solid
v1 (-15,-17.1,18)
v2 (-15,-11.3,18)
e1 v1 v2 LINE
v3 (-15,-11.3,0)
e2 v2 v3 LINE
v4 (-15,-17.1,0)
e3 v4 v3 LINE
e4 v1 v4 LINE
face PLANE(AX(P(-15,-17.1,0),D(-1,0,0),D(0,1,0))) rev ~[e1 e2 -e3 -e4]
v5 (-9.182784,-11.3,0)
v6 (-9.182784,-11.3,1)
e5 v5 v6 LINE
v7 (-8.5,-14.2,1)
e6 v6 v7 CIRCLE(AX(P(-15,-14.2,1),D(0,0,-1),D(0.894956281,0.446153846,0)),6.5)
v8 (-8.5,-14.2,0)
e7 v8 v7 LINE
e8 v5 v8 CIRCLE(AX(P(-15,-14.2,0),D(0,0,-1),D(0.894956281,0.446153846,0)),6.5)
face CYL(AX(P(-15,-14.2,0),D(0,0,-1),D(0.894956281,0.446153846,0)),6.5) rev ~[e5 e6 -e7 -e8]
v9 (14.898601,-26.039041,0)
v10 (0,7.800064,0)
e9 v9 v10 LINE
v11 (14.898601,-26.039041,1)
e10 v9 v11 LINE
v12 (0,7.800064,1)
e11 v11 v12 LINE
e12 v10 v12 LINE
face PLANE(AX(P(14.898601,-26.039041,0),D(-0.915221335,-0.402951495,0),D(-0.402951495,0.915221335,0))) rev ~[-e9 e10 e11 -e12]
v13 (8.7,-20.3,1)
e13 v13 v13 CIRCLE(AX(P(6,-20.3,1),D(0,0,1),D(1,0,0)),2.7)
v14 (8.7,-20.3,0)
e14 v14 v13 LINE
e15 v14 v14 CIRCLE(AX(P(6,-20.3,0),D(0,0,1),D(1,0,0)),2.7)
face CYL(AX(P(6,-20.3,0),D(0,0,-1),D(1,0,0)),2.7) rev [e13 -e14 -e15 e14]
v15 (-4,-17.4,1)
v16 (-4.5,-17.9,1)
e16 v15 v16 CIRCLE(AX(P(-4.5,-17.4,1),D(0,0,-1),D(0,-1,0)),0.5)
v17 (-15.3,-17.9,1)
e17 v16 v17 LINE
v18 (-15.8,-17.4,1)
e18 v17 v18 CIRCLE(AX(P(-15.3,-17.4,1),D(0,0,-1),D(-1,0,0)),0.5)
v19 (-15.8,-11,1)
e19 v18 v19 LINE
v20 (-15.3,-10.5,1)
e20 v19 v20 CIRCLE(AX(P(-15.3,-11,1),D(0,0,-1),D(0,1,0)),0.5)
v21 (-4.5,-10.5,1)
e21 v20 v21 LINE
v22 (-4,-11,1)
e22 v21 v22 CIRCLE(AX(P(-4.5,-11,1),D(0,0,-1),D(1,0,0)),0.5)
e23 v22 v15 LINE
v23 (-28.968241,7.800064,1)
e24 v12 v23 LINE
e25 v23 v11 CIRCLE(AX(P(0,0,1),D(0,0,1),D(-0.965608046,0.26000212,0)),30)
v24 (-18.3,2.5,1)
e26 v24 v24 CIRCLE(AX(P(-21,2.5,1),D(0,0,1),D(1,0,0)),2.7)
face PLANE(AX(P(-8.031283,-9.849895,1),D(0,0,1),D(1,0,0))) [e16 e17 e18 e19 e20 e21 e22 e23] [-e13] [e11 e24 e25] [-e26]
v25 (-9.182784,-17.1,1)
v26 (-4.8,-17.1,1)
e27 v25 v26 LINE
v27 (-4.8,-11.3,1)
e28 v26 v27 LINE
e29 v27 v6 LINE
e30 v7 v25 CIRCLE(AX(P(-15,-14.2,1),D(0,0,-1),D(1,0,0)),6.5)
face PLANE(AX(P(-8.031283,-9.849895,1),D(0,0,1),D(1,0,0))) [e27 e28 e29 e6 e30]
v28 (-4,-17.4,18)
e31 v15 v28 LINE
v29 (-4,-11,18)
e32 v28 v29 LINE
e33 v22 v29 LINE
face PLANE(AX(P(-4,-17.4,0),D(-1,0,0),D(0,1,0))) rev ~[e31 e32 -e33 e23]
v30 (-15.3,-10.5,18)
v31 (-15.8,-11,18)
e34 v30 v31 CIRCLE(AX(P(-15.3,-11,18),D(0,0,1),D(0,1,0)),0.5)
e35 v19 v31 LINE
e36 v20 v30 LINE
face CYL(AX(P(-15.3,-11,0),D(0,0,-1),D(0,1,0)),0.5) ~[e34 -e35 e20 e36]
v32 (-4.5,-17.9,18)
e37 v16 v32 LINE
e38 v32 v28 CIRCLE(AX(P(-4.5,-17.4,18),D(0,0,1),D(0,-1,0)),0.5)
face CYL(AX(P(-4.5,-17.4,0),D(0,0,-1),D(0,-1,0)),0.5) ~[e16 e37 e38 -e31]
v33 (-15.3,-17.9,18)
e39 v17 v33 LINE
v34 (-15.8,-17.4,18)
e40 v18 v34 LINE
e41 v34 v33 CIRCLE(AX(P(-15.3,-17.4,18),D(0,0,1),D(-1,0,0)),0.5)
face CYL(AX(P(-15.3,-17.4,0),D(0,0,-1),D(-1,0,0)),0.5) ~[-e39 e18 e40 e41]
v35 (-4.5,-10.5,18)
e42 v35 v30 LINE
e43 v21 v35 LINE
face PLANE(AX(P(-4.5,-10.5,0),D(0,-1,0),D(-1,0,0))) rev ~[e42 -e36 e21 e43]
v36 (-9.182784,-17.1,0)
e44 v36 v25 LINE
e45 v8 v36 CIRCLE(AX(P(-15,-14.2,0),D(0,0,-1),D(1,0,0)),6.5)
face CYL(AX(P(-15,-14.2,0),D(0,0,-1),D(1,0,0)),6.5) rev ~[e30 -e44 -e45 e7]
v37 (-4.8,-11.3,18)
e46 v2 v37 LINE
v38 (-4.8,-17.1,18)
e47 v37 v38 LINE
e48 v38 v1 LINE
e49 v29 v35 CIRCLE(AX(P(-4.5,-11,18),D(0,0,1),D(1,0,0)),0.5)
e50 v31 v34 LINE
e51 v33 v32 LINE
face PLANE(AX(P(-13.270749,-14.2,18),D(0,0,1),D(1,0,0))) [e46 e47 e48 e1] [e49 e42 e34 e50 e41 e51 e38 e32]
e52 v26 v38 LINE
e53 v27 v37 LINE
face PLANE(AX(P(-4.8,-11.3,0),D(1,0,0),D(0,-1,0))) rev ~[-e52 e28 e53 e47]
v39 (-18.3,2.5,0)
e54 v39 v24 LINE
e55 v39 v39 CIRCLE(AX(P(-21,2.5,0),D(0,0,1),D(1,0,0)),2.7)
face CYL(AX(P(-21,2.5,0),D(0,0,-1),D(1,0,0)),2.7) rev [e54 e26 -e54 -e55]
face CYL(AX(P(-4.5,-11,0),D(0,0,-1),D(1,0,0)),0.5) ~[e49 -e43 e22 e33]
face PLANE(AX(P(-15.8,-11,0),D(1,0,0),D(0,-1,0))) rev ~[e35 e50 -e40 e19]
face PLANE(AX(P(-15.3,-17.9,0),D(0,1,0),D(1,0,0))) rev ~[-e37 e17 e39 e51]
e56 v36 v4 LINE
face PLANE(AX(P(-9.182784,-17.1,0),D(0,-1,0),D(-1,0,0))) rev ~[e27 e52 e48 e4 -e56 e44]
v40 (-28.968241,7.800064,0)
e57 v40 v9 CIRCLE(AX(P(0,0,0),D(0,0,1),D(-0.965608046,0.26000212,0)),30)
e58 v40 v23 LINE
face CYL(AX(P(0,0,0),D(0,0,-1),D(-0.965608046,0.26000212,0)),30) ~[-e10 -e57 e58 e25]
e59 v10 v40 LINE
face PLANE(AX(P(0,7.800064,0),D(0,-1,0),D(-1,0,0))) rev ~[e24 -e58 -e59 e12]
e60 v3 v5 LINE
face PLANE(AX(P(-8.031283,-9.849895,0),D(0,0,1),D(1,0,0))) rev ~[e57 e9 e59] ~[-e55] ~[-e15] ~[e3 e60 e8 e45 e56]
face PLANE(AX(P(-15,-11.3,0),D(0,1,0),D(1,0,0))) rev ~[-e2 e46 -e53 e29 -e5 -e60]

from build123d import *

# Parameters (mm, degrees)
F0_R     = 2.7
F1_DEPTH = 1
F2_DEPTH = 18


# Not quite as in the source:
# - a feature names something its author has since deleted; it is built from what else it names


with BuildPart() as f1:
    # F0 (on Top) → F1 (new body)
    with BuildSketch(Plane.XY):
        with BuildLine():
            Line((0, 7.8000635883), (-28.9682413691, 7.8000635883))
            ThreePointArc((-28.9682413691, 7.8000635883), (-18.3237536434, -23.7537376515), (14.8986014601, -26.039041352))
            Line((14.8986014601, -26.039041352), (0, 7.8000635883))
        make_face()
        with BuildLine():
            ThreePointArc((-9.6558443136, -17.9), (-21.5, -14.2), (-9.6558443136, -10.5))
            Line((-9.6558443136, -10.5), (-4.5, -10.5))
            ThreePointArc((-4.5, -10.5), (-4.1464466094, -10.6464466094), (-4, -11))
            Line((-4, -11), (-4, -17.4))
            ThreePointArc((-4, -17.4), (-4.1464466094, -17.7535533906), (-4.5, -17.9))
            Line((-4.5, -17.9), (-9.6558443136, -17.9))
        make_face(mode=Mode.SUBTRACT)
        with Locations((6, -20.3)):
            Circle(F0_R, mode=Mode.SUBTRACT)
        with Locations((-21, 2.5)):
            Circle(F0_R, mode=Mode.SUBTRACT)
        with BuildLine():
            Line((-15.3, -10.5), (-9.6558443136, -10.5))
            ThreePointArc((-9.6558443136, -10.5), (-21.5, -14.2), (-9.6558443136, -17.9))
            Line((-9.6558443136, -17.9), (-15.3, -17.9))
            ThreePointArc((-15.3, -17.9), (-15.6535533906, -17.7535533906), (-15.8, -17.4))
            Line((-15.8, -17.4), (-15.8, -11))
            ThreePointArc((-15.8, -11), (-15.6535533906, -10.6464466094), (-15.3, -10.5))
        make_face()
        with BuildLine():
            Line((-15, -11.3), (-9.1827841711, -11.3))
            ThreePointArc((-9.1827841711, -11.3), (-9.4049974508, -10.8915341207), (-9.6558443136, -10.5))
            Line((-9.6558443136, -10.5), (-15.3, -10.5))
            ThreePointArc((-15.3, -10.5), (-15.6535533906, -10.6464466094), (-15.8, -11))
            Line((-15.8, -11), (-15.8, -17.4))
            ThreePointArc((-15.8, -17.4), (-15.6535533906, -17.7535533906), (-15.3, -17.9))
            Line((-15.3, -17.9), (-9.6558443136, -17.9))
            ThreePointArc((-9.6558443136, -17.9), (-9.4049974508, -17.5084658793), (-9.1827841711, -17.1))
            Line((-9.1827841711, -17.1), (-15, -17.1))
            Line((-15, -17.1), (-15, -11.3))
        make_face()
        with BuildLine():
            ThreePointArc((-9.6558443136, -10.5), (-9.4049974508, -10.8915341207), (-9.1827841711, -11.3))
            Line((-9.1827841711, -11.3), (-4.8, -11.3))
            Line((-4.8, -11.3), (-4.8, -17.1))
            Line((-4.8, -17.1), (-9.1827841711, -17.1))
            ThreePointArc((-9.1827841711, -17.1), (-9.4049974508, -17.5084658793), (-9.6558443136, -17.9))
            Line((-9.6558443136, -17.9), (-4.5, -17.9))
            ThreePointArc((-4.5, -17.9), (-4.1464466094, -17.7535533906), (-4, -17.4))
            Line((-4, -17.4), (-4, -11))
            ThreePointArc((-4, -11), (-4.1464466094, -10.6464466094), (-4.5, -10.5))
            Line((-4.5, -10.5), (-9.6558443136, -10.5))
        make_face()
        with BuildLine():
            ThreePointArc((-9.1827841711, -11.3), (-8.6729982263, -12.7103528753), (-8.5, -14.2))
            ThreePointArc((-8.5, -14.2), (-8.6729982263, -15.6896471247), (-9.1827841711, -17.1))
            Line((-9.1827841711, -17.1), (-4.8, -17.1))
            Line((-4.8, -17.1), (-4.8, -11.3))
            Line((-4.8, -11.3), (-9.1827841711, -11.3))
        make_face()
    extrude(amount=F1_DEPTH)

    # F0 (on Top) → F2 (join)
    with BuildSketch(Plane.XY):
        with BuildLine():
            Line((-15, -11.3), (-9.1827841711, -11.3))
            ThreePointArc((-9.1827841711, -11.3), (-9.4049974508, -10.8915341207), (-9.6558443136, -10.5))
            Line((-9.6558443136, -10.5), (-15.3, -10.5))
            ThreePointArc((-15.3, -10.5), (-15.6535533906, -10.6464466094), (-15.8, -11))
            Line((-15.8, -11), (-15.8, -17.4))
            ThreePointArc((-15.8, -17.4), (-15.6535533906, -17.7535533906), (-15.3, -17.9))
            Line((-15.3, -17.9), (-9.6558443136, -17.9))
            ThreePointArc((-9.6558443136, -17.9), (-9.4049974508, -17.5084658793), (-9.1827841711, -17.1))
            Line((-9.1827841711, -17.1), (-15, -17.1))
            Line((-15, -17.1), (-15, -11.3))
        make_face()
        with BuildLine():
            ThreePointArc((-9.6558443136, -10.5), (-9.4049974508, -10.8915341207), (-9.1827841711, -11.3))
            Line((-9.1827841711, -11.3), (-4.8, -11.3))
            Line((-4.8, -11.3), (-4.8, -17.1))
            Line((-4.8, -17.1), (-9.1827841711, -17.1))
            ThreePointArc((-9.1827841711, -17.1), (-9.4049974508, -17.5084658793), (-9.6558443136, -17.9))
            Line((-9.6558443136, -17.9), (-4.5, -17.9))
            ThreePointArc((-4.5, -17.9), (-4.1464466094, -17.7535533906), (-4, -17.4))
            Line((-4, -17.4), (-4, -11))
            ThreePointArc((-4, -11), (-4.1464466094, -10.6464466094), (-4.5, -10.5))
            Line((-4.5, -10.5), (-9.6558443136, -10.5))
        make_face()
    extrude(amount=F2_DEPTH)


solid = f1.part
